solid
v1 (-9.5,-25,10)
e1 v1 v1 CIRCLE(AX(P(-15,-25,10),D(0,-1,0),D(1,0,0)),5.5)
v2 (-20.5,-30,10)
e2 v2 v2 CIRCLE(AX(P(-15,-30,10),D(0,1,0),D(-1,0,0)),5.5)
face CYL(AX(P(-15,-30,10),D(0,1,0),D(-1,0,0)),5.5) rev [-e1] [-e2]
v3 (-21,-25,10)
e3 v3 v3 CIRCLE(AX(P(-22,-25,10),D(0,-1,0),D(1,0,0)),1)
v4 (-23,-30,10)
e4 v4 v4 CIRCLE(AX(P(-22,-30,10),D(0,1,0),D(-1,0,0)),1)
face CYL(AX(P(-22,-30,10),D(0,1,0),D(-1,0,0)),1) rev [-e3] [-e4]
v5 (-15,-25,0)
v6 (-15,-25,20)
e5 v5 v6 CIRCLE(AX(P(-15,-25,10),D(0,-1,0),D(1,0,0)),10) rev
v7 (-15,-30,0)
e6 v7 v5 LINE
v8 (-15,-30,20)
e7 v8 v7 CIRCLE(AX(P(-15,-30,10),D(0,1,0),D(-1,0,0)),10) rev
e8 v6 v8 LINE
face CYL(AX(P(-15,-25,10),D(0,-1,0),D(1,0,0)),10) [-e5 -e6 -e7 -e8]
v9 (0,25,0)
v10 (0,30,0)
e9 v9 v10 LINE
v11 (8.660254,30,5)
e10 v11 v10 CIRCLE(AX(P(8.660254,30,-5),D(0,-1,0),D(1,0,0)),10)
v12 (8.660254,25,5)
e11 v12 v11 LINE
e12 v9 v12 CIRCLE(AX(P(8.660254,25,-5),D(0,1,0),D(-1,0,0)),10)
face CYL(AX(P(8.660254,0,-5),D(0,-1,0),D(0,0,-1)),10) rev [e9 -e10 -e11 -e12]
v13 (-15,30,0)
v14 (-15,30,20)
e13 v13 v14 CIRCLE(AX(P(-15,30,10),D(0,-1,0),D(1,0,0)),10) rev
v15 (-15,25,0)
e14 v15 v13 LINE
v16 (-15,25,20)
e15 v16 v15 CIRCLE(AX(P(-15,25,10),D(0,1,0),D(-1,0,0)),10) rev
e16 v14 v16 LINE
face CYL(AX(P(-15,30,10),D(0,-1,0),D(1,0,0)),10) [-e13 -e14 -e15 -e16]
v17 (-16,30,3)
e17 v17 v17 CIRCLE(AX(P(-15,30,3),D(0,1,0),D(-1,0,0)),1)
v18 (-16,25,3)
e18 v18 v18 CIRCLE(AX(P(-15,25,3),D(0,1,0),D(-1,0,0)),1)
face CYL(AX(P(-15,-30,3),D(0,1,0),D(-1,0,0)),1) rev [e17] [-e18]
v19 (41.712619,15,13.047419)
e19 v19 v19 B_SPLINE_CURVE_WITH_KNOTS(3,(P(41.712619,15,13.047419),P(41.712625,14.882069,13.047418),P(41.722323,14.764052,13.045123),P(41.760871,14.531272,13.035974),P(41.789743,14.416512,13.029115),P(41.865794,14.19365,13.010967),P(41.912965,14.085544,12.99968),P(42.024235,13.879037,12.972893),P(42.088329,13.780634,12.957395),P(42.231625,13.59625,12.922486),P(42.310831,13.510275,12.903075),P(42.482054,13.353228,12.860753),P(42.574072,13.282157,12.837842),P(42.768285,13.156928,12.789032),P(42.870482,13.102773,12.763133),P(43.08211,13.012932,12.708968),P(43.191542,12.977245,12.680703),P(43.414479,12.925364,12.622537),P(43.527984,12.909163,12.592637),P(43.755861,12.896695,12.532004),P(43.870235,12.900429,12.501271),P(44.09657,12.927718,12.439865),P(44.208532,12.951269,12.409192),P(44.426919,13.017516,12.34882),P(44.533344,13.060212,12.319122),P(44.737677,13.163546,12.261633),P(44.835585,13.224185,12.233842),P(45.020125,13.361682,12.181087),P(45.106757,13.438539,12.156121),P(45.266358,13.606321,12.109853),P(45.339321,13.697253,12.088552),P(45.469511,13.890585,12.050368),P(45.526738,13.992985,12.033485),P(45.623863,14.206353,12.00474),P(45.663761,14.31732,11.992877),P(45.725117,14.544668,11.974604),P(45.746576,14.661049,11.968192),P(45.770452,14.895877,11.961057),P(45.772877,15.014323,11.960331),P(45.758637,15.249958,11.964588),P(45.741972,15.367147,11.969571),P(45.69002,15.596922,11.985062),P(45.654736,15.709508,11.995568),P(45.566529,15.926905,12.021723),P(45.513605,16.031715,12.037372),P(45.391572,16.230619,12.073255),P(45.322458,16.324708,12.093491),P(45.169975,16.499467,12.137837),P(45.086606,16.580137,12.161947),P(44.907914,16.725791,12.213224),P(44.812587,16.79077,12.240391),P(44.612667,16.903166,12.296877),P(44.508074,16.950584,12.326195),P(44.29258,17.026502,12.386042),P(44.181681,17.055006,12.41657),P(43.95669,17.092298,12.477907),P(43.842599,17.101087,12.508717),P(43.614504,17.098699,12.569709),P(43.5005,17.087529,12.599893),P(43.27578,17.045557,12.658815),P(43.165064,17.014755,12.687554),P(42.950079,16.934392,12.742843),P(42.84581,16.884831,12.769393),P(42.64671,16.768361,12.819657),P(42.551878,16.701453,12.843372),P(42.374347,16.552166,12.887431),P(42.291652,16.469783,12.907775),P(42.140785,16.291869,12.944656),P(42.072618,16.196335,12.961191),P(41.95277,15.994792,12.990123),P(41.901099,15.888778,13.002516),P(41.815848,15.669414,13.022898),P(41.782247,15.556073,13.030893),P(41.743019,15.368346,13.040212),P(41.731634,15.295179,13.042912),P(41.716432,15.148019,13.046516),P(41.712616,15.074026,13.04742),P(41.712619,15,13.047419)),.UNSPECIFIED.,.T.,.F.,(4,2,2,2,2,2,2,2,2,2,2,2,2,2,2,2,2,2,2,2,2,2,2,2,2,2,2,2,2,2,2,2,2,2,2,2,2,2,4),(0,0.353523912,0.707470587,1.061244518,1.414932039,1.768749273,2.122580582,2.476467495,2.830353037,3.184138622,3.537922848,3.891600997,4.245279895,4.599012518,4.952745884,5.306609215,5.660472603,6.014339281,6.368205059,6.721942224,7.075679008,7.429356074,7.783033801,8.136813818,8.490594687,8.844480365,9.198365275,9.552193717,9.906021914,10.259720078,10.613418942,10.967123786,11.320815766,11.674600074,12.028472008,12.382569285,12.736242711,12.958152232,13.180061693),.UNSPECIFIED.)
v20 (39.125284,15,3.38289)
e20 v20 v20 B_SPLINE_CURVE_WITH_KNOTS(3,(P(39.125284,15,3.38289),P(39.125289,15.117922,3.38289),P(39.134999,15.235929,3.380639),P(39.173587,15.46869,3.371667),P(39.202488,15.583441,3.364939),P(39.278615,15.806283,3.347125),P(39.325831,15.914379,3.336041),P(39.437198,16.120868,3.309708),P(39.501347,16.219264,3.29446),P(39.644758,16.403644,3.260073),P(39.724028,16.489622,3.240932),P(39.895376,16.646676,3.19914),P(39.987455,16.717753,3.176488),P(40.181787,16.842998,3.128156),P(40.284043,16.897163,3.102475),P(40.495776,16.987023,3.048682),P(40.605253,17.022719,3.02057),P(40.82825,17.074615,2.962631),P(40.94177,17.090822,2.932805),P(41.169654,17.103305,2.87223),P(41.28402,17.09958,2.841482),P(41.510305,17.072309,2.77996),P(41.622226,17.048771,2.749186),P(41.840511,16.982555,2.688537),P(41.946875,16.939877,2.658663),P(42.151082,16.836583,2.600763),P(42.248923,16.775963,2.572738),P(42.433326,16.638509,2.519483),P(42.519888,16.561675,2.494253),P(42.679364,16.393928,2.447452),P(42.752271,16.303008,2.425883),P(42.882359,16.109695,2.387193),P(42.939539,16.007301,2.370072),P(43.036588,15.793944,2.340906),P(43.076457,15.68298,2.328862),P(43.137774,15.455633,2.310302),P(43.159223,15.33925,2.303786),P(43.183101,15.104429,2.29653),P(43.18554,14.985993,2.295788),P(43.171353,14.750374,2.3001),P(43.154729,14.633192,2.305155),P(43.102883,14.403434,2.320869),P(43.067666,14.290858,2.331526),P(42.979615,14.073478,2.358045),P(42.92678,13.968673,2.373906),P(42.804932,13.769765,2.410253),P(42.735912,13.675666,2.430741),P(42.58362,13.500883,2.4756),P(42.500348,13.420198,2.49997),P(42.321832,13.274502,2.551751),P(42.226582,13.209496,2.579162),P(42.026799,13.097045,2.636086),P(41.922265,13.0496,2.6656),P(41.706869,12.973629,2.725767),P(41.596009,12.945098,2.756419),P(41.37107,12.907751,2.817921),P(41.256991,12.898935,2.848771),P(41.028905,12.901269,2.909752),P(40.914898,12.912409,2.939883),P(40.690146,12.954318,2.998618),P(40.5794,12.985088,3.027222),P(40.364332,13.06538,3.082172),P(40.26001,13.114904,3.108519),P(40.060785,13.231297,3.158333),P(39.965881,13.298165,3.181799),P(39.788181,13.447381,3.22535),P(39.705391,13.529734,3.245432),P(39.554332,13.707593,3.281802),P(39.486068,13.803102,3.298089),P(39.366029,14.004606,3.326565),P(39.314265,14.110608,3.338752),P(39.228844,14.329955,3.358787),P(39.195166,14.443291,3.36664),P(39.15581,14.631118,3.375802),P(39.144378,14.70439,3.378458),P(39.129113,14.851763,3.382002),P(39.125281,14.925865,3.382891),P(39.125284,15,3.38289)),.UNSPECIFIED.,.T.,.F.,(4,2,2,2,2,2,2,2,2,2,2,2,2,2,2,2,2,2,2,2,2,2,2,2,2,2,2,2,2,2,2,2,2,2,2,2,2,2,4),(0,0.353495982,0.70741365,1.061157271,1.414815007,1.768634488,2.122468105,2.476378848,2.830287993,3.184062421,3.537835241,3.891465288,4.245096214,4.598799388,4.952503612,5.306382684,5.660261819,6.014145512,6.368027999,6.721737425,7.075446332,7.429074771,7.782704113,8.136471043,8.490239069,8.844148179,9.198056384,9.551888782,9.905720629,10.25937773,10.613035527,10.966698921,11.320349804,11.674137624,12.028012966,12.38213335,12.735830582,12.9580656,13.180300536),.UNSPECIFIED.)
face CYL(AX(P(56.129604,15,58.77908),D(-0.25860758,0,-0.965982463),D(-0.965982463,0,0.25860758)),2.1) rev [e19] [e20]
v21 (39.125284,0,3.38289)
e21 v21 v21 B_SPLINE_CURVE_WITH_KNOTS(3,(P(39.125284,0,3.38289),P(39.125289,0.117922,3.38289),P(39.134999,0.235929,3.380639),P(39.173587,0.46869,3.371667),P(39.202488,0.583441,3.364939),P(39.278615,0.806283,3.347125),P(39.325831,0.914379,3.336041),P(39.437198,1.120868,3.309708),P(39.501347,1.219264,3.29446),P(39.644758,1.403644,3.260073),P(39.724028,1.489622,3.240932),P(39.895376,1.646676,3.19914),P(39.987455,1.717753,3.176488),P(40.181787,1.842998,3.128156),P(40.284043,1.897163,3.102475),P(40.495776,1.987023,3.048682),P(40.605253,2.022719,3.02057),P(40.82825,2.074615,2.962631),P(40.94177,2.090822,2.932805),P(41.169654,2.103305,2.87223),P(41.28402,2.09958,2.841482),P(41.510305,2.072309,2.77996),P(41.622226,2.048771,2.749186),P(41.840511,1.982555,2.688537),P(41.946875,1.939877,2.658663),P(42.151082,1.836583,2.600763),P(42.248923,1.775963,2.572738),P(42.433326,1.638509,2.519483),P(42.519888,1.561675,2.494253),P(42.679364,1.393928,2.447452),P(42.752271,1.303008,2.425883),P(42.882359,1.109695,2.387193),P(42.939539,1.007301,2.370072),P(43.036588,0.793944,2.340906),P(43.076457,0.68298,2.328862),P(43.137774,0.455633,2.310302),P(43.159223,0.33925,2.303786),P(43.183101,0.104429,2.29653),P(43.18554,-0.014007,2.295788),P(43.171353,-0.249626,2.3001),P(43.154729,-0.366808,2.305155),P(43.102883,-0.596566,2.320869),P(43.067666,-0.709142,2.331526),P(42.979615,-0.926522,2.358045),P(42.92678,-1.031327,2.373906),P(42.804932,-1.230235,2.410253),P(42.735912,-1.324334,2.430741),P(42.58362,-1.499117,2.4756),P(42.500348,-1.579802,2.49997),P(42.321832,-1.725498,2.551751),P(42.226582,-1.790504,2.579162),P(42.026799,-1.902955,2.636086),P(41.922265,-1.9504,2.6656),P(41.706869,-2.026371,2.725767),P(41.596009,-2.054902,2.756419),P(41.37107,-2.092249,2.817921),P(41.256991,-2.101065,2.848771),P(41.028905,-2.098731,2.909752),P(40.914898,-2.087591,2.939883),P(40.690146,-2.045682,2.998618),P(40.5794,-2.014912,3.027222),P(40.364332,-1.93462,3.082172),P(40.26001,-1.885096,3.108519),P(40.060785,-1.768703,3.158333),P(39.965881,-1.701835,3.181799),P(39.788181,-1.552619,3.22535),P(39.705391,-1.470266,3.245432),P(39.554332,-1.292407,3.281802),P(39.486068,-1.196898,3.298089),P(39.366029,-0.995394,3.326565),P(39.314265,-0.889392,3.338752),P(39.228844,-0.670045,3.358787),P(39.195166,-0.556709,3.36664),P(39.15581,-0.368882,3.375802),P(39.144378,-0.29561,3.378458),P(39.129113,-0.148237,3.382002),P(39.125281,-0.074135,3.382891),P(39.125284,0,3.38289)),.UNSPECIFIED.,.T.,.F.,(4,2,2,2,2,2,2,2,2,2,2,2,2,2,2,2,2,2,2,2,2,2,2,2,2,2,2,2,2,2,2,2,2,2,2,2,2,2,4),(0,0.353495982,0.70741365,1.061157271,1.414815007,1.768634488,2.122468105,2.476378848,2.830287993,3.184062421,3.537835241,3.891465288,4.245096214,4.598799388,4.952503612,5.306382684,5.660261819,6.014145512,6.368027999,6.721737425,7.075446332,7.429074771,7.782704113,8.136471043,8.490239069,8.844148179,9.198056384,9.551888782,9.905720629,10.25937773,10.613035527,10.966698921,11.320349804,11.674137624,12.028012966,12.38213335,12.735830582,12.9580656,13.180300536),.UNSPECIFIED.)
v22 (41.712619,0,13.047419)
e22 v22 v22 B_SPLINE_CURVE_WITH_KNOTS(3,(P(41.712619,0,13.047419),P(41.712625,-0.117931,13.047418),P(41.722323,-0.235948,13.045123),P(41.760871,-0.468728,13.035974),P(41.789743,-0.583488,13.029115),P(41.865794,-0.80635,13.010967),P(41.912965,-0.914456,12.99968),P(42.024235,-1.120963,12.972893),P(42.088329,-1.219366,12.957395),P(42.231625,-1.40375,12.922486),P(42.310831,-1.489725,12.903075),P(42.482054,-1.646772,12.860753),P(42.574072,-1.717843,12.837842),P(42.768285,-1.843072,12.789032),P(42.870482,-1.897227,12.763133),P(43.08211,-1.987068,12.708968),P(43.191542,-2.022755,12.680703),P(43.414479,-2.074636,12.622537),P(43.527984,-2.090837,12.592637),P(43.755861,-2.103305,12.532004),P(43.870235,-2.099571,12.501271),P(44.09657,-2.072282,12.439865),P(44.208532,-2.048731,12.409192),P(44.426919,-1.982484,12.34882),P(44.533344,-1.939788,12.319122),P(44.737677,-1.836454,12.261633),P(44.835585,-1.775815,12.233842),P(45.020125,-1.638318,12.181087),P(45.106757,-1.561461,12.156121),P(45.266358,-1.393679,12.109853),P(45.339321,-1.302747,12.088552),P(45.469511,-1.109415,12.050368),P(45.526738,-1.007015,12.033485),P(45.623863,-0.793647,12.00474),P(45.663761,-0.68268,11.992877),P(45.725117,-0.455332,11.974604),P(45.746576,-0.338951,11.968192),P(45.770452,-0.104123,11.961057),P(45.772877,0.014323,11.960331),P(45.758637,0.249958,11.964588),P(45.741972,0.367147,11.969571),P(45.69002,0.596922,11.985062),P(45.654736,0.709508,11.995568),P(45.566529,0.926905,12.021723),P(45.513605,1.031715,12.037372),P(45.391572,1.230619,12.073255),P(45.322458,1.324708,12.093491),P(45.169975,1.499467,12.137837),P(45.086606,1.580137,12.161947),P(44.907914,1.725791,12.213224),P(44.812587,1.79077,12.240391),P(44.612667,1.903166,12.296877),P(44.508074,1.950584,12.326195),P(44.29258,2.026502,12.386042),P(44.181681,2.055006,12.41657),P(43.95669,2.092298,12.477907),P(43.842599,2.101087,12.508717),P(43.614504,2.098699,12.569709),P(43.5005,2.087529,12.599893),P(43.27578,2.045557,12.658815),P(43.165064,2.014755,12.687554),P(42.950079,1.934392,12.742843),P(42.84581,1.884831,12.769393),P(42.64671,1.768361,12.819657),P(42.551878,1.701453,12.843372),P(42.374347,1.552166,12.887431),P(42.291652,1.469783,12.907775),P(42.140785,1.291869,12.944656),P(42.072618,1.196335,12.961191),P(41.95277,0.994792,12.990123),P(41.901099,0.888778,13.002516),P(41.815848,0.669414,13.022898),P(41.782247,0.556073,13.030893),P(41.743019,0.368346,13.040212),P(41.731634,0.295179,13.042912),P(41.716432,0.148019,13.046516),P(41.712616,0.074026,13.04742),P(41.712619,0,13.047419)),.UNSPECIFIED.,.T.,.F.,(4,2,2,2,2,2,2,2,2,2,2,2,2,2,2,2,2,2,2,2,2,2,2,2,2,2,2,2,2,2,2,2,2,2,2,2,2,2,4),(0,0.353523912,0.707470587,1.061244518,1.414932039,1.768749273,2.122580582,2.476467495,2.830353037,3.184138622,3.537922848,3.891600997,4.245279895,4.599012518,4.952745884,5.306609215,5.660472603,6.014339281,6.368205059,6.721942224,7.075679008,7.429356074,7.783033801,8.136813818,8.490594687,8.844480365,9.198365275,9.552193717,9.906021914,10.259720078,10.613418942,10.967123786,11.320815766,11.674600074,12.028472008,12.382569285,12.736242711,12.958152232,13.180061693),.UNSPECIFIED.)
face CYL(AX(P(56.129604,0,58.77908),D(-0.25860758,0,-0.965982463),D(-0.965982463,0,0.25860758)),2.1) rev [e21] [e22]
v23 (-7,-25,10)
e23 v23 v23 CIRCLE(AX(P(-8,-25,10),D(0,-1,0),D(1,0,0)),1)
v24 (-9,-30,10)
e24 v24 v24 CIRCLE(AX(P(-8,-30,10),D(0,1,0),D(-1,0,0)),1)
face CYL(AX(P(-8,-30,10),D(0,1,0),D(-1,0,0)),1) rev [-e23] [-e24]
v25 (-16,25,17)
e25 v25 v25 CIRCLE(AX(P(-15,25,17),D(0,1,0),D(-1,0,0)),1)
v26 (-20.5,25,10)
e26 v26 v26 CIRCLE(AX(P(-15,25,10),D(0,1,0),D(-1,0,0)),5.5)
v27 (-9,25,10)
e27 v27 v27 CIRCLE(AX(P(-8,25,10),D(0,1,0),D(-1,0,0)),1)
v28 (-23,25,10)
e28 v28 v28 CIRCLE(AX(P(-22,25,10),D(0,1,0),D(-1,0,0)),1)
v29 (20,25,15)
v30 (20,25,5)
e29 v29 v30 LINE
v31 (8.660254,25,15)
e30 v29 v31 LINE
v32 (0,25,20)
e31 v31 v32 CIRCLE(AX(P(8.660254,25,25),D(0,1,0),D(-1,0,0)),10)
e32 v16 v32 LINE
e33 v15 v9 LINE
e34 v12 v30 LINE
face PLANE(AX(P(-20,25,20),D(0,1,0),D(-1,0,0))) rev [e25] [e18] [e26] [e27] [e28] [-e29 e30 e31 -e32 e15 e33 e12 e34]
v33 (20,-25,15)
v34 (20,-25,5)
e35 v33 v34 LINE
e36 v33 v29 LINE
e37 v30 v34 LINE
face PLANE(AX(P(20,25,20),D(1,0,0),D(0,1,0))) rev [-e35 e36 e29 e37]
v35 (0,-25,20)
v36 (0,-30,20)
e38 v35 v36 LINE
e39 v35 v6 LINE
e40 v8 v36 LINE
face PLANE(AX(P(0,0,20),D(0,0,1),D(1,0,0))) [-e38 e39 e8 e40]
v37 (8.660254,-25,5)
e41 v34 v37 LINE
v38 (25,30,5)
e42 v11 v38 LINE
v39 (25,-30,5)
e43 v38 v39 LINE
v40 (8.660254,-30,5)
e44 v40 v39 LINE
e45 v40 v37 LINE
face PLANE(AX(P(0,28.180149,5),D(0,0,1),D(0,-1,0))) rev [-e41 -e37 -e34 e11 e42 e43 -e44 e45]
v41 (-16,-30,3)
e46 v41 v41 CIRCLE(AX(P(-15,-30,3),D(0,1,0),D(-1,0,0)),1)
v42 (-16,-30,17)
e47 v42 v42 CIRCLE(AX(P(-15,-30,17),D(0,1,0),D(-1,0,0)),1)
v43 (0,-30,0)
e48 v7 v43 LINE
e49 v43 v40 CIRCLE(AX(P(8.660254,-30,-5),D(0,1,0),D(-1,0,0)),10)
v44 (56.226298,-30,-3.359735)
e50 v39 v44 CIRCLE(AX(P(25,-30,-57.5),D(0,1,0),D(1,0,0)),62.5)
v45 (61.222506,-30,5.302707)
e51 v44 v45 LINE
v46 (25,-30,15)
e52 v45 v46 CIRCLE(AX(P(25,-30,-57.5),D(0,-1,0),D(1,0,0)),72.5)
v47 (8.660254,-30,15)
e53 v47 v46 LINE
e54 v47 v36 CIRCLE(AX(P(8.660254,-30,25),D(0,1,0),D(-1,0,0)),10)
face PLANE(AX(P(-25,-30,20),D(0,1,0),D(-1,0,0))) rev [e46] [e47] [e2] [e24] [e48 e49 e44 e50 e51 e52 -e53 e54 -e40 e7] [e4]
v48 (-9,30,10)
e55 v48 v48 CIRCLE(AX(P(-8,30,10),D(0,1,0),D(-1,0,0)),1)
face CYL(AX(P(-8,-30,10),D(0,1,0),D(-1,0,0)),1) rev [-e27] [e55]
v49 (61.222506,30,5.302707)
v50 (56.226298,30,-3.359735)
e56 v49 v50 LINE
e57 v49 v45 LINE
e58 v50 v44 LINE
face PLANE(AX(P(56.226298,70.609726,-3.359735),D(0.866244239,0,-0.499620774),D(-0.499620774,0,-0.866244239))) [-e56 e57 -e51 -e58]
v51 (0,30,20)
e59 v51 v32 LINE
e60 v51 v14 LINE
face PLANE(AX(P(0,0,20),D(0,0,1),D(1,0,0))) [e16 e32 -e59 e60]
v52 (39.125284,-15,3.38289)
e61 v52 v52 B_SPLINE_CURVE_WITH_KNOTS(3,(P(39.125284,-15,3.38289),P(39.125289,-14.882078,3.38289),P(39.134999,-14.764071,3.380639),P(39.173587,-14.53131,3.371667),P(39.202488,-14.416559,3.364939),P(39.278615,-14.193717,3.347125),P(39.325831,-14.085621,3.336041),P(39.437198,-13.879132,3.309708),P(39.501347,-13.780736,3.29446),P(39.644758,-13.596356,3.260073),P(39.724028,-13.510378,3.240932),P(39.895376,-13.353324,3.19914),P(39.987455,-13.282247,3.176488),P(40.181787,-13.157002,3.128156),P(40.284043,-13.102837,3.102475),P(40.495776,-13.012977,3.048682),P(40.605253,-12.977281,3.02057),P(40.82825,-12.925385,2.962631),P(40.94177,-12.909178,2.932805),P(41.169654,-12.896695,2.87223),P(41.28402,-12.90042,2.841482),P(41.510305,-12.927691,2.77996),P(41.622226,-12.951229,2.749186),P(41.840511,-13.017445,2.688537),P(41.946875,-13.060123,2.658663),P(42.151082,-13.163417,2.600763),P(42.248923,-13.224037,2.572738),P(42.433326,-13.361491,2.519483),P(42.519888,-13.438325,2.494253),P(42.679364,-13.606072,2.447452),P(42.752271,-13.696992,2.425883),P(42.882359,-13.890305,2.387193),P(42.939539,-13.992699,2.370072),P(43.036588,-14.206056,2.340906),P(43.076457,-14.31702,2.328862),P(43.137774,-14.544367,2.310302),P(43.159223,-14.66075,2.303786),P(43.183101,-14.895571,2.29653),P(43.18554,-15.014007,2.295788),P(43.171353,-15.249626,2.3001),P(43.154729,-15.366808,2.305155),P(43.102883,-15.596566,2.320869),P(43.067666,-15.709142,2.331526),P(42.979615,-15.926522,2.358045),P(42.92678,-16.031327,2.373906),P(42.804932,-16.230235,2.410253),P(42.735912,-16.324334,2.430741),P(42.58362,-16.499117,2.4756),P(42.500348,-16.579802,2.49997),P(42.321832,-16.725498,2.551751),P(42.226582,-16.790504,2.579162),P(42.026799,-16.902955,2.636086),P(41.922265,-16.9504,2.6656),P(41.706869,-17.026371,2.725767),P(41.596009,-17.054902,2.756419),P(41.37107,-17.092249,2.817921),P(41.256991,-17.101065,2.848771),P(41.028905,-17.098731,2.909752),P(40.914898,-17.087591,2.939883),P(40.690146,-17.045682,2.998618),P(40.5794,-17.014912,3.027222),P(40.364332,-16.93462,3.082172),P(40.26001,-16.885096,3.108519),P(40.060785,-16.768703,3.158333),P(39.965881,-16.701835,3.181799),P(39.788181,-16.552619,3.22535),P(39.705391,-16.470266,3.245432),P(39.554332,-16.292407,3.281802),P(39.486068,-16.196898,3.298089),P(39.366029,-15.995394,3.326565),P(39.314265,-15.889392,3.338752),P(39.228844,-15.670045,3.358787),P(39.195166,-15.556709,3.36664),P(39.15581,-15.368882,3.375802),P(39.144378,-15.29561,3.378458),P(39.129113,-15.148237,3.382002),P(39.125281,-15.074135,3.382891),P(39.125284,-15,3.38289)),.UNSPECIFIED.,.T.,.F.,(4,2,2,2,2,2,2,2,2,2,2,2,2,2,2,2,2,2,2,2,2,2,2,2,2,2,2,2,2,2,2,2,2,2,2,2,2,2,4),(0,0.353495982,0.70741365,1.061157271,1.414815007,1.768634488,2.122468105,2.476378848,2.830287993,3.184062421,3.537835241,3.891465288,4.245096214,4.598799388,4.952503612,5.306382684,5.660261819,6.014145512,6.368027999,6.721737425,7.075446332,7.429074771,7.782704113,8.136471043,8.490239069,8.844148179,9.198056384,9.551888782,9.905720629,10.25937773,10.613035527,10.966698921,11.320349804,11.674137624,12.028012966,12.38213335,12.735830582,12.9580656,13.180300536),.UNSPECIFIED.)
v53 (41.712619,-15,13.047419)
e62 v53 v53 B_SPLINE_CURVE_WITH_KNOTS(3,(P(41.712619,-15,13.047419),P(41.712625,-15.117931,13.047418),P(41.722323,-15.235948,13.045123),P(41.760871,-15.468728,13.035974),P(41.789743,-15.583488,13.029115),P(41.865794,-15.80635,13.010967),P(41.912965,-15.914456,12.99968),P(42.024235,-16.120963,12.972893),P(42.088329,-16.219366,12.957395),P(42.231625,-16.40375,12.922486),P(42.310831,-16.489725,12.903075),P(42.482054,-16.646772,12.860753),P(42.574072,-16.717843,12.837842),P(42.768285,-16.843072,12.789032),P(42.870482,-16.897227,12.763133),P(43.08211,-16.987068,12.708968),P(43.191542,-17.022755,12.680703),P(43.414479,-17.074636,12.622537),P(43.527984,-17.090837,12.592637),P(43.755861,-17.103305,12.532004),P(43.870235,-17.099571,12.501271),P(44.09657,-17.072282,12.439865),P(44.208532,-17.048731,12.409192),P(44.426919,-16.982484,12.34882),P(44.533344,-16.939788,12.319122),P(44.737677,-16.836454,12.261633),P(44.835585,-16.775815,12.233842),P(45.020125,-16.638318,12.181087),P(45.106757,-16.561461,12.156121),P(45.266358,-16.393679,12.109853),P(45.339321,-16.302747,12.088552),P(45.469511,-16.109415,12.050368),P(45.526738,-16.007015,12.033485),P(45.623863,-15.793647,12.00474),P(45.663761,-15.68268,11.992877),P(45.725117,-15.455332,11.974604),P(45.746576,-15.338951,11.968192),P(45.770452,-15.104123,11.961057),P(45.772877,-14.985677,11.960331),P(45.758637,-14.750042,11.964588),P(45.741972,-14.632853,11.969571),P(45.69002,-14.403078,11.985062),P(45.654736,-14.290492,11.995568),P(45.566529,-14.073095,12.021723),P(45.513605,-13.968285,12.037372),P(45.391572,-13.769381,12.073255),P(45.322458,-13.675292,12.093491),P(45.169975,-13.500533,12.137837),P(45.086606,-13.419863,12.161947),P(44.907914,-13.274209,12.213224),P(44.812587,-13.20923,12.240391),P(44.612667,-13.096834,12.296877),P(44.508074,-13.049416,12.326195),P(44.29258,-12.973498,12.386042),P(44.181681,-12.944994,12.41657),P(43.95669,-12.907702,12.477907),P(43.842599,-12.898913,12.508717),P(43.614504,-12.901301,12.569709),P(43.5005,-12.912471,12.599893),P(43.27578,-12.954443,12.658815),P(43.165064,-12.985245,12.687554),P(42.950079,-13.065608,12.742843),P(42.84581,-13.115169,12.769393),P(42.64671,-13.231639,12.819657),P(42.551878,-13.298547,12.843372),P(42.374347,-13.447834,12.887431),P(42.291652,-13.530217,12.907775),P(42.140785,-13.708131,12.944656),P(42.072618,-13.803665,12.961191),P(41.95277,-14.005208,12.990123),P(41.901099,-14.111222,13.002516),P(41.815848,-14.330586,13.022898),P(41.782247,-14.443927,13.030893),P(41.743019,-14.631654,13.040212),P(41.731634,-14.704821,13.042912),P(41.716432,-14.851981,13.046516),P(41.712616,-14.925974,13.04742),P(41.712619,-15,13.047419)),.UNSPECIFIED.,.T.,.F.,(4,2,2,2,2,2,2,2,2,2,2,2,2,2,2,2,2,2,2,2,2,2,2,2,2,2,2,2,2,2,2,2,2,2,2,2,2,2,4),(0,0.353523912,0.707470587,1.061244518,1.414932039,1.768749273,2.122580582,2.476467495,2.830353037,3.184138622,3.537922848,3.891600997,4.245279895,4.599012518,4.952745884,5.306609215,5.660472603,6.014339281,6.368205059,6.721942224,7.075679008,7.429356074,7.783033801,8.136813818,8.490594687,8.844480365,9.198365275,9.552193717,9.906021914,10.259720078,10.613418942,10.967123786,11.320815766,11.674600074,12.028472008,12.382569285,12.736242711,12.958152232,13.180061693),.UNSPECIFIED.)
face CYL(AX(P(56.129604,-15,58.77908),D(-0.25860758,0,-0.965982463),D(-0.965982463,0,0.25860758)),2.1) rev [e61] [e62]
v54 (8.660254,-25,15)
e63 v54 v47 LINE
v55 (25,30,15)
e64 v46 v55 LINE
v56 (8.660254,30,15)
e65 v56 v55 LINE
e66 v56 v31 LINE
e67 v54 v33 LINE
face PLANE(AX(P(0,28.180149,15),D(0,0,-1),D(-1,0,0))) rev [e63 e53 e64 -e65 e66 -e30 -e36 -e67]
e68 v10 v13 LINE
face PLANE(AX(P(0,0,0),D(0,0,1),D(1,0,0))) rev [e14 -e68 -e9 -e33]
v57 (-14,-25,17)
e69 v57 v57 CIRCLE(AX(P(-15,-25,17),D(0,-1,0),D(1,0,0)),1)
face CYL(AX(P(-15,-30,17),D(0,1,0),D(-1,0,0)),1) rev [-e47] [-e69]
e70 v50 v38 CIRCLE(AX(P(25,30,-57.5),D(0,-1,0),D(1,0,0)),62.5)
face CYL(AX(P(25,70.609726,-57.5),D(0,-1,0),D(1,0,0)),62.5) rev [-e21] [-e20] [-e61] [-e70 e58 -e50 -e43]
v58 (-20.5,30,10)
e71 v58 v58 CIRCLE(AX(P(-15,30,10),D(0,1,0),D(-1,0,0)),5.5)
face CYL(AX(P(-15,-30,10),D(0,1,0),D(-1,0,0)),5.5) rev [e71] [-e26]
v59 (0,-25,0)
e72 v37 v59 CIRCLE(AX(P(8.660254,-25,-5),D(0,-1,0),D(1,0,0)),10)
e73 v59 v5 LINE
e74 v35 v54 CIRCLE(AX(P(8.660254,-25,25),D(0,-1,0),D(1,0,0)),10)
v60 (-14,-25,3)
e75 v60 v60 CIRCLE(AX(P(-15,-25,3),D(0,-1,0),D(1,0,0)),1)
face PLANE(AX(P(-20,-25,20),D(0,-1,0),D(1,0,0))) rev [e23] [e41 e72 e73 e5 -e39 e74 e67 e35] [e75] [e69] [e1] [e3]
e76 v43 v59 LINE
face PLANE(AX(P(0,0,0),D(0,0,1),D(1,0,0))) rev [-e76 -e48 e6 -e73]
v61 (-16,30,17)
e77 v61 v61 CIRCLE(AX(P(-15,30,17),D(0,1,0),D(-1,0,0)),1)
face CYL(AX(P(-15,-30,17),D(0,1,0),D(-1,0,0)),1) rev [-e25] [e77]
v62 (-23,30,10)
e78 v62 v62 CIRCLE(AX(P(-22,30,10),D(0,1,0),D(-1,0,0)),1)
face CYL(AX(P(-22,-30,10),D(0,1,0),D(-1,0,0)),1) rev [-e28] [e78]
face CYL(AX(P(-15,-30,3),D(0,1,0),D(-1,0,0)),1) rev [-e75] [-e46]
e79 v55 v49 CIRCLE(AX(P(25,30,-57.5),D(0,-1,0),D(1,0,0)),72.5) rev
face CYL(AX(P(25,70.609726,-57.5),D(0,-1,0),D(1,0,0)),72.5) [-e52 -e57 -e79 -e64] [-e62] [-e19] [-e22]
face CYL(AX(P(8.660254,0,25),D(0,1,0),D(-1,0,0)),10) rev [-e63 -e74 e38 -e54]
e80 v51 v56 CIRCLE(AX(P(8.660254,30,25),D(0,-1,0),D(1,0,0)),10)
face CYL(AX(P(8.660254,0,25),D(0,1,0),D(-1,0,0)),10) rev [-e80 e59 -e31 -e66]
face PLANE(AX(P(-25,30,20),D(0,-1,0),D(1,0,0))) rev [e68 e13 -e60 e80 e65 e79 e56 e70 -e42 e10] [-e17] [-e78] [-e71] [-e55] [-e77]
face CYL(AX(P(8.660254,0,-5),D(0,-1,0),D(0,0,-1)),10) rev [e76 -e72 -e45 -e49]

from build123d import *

# Parameters (mm, degrees)
BOSS_EXTRUDE2_DEPTH = 20
FILLET1_RADIUS      = 10
FILLET1_LENGTH      = 5
FILLET2_RADIUS      = 10
FILLET2_LENGTH      = 5
SKETCH5_R           = 1
SKETCH5_R_2         = 5.5
CUT_EXTRUDE5_DEPTH  = 69.007352544
CUT_EXTRUDE7_DEPTH  = 25
FILLET5_R           = 10
BOSS_EXTRUDE5_DEPTH = 60
SKETCH13_R          = 2.1
CUT_EXTRUDE8_DEPTH  = 60


with BuildPart() as part:
    # Sketch1 → Boss-Extrude2 (new body)
    with BuildSketch(Plane.XY):
        Polygon((-25, 30), (25, 30), (25, -30), (-25, -30), (-25, -25), (-20, -25), (20, -25), (20, 25), (-20, 25), (-25, 25), align=None)
    extrude(amount=BOSS_EXTRUDE2_DEPTH)

    # Fillet1: full round fillet: the end face becomes a half cylinder, R = half its width
    fillet1_face = Plane((-25, 27.5, 10), x_dir=(0, -1, 0), z_dir=(-1, 0, 0))  # on the end face: x along it, z out of the body
    fillet1_slab = fillet1_face.offset(-FILLET1_RADIUS / 2) * Box(FILLET1_LENGTH, 2 * FILLET1_RADIUS, FILLET1_RADIUS, mode=Mode.PRIVATE)  # the body's end, R deep
    fillet1_round = Plane((-15, 27.5, 10), x_dir=(-1, 0, 0), z_dir=(0, -1, 0)) * Cylinder(FILLET1_RADIUS, FILLET1_LENGTH, mode=Mode.PRIVATE)  # its axis R under the face
    add(fillet1_slab - fillet1_round, mode=Mode.SUBTRACT)

    # Fillet2: full round fillet: the end face becomes a half cylinder, R = half its width
    fillet2_face = Plane((-25, -27.5, 10), x_dir=(0, -1, 0), z_dir=(-1, 0, 0))  # on the end face: x along it, z out of the body
    fillet2_slab = fillet2_face.offset(-FILLET2_RADIUS / 2) * Box(FILLET2_LENGTH, 2 * FILLET2_RADIUS, FILLET2_RADIUS, mode=Mode.PRIVATE)  # the body's end, R deep
    fillet2_round = Plane((-15, -27.5, 10), x_dir=(-1, 0, 0), z_dir=(0, -1, 0)) * Cylinder(FILLET2_RADIUS, FILLET2_LENGTH, mode=Mode.PRIVATE)  # its axis R under the face
    add(fillet2_slab - fillet2_round, mode=Mode.SUBTRACT)

    # Sketch5 → Cut-Extrude5 (cut, through all)
    with BuildSketch(Plane(origin=(0, 30, 0), x_dir=(1, 0, 0), z_dir=(0, 1, 0))):
        with Locations(Location((-15, -3, 0), (0, 0, 180))):
            Circle(SKETCH5_R)
        with Locations(Location((-22, -10, 0), (0, 0, 180))):
            Circle(SKETCH5_R)
        with Locations(Location((-15, -17, 0), (0, 0, 180))):
            Circle(SKETCH5_R)
        with Locations(Location((-8, -10, 0), (0, 0, 180))):
            Circle(SKETCH5_R)
        with Locations(Location((-15, -10, 0), (0, 0, 180))):
            Circle(SKETCH5_R_2)
    extrude(amount=-CUT_EXTRUDE5_DEPTH, mode=Mode.SUBTRACT)

    # Sketch10 → Cut-Extrude7 (cut)
    with BuildSketch(Plane(origin=(25, 0, 0), x_dir=(0, 0, -1), z_dir=(1, 0, 0))):
        Polygon((-15, 28.180148829), (-15, -28.180148829), (-15, -30), (-20, -30), (-20, 30), (-15, 30), align=None)
        Polygon((-5, 28.180148829), (-5, -28.180148829), (-5, -30), (0, -30), (0, 30), (-5, 30), align=None)
    extrude(amount=-CUT_EXTRUDE7_DEPTH, mode=Mode.SUBTRACT)

    # Fillet5
    # the kernel refuses this fillet: 10 mm, written as the material it adds along each edge
    with BuildSketch(Plane(origin=(0, 25, 15), x_dir=(1, 0, 0), z_dir=(0, 1, 0)), Plane(origin=(0, -30, 15), x_dir=(1, 0, 0), z_dir=(0, 1, 0)), Plane(origin=(0, -25, 5), x_dir=(1, 0, 0), z_dir=(0, -1, 0))) as fillet5_piece_1:
        with BuildLine():
            CenterArc((8.660254038, -10), FILLET5_R, 90, 60)
            Line((0, -5), (-0.173205081, -4.9))
            ThreePointArc((-0.173205081, -4.9), (-0.2, -2.5), (-0.2, 0))
            Line((-0.2, 0), (0, 0.2))
            Line((0, 0.2), (8.660254038, 0.2))
            Line((8.660254038, 0.2), (8.660254038, 0))
        make_face()
    extrude(amount=5)
    with BuildSketch(Plane(origin=(0, 30, 5), x_dir=(0, 0, -1), z_dir=(0, -1, 0))) as fillet5_piece_2:
        with BuildLine():
            CenterArc((10, 8.660254038), FILLET5_R, 180, 60)
            Line((0, 8.660254038), (-0.2, 8.660254038))
            Line((-0.2, 8.660254038), (-0.2, 0))
            Line((-0.2, 0), (0, -0.2))
            ThreePointArc((0, -0.2), (2.5, -0.2), (4.9, -0.173205081))
            Line((4.9, -0.173205081), (5, 0))
        make_face()
    extrude(amount=5)

    # Sketch12 → Boss-Extrude5 (add)
    with BuildSketch(Plane.XZ.offset(30)):
        with BuildLine():
            Line((56.226298398, -3.359735054), (61.222506141, 5.302707337))
            ThreePointArc((61.222506141, 5.302707337), (43.74904955, 12.533728595), (25, 15))
            Line((25, 15), (25, 5))
            ThreePointArc((25, 5), (41.16297375, 2.873903962), (56.226298398, -3.359735054))
        make_face()
    extrude(amount=-BOSS_EXTRUDE5_DEPTH)

    # Sketch13 → Cut-Extrude8 (cut)
    with BuildSketch(Plane(origin=(2.920998947, 0, 10.910870277), x_dir=(-0.9659824633840055, 0, 0.2586075800021504), z_dir=(-0.2586075800021504, 0, -0.9659824633840055))):
        with Locations((-39.019497435, 15)):
            Circle(SKETCH13_R)
        with Locations((-39.019497435, 0)):
            Circle(SKETCH13_R)
        with Locations((-39.019497435, -15)):
            Circle(SKETCH13_R)
    extrude(amount=-CUT_EXTRUDE8_DEPTH, mode=Mode.SUBTRACT)


solid = part.part
